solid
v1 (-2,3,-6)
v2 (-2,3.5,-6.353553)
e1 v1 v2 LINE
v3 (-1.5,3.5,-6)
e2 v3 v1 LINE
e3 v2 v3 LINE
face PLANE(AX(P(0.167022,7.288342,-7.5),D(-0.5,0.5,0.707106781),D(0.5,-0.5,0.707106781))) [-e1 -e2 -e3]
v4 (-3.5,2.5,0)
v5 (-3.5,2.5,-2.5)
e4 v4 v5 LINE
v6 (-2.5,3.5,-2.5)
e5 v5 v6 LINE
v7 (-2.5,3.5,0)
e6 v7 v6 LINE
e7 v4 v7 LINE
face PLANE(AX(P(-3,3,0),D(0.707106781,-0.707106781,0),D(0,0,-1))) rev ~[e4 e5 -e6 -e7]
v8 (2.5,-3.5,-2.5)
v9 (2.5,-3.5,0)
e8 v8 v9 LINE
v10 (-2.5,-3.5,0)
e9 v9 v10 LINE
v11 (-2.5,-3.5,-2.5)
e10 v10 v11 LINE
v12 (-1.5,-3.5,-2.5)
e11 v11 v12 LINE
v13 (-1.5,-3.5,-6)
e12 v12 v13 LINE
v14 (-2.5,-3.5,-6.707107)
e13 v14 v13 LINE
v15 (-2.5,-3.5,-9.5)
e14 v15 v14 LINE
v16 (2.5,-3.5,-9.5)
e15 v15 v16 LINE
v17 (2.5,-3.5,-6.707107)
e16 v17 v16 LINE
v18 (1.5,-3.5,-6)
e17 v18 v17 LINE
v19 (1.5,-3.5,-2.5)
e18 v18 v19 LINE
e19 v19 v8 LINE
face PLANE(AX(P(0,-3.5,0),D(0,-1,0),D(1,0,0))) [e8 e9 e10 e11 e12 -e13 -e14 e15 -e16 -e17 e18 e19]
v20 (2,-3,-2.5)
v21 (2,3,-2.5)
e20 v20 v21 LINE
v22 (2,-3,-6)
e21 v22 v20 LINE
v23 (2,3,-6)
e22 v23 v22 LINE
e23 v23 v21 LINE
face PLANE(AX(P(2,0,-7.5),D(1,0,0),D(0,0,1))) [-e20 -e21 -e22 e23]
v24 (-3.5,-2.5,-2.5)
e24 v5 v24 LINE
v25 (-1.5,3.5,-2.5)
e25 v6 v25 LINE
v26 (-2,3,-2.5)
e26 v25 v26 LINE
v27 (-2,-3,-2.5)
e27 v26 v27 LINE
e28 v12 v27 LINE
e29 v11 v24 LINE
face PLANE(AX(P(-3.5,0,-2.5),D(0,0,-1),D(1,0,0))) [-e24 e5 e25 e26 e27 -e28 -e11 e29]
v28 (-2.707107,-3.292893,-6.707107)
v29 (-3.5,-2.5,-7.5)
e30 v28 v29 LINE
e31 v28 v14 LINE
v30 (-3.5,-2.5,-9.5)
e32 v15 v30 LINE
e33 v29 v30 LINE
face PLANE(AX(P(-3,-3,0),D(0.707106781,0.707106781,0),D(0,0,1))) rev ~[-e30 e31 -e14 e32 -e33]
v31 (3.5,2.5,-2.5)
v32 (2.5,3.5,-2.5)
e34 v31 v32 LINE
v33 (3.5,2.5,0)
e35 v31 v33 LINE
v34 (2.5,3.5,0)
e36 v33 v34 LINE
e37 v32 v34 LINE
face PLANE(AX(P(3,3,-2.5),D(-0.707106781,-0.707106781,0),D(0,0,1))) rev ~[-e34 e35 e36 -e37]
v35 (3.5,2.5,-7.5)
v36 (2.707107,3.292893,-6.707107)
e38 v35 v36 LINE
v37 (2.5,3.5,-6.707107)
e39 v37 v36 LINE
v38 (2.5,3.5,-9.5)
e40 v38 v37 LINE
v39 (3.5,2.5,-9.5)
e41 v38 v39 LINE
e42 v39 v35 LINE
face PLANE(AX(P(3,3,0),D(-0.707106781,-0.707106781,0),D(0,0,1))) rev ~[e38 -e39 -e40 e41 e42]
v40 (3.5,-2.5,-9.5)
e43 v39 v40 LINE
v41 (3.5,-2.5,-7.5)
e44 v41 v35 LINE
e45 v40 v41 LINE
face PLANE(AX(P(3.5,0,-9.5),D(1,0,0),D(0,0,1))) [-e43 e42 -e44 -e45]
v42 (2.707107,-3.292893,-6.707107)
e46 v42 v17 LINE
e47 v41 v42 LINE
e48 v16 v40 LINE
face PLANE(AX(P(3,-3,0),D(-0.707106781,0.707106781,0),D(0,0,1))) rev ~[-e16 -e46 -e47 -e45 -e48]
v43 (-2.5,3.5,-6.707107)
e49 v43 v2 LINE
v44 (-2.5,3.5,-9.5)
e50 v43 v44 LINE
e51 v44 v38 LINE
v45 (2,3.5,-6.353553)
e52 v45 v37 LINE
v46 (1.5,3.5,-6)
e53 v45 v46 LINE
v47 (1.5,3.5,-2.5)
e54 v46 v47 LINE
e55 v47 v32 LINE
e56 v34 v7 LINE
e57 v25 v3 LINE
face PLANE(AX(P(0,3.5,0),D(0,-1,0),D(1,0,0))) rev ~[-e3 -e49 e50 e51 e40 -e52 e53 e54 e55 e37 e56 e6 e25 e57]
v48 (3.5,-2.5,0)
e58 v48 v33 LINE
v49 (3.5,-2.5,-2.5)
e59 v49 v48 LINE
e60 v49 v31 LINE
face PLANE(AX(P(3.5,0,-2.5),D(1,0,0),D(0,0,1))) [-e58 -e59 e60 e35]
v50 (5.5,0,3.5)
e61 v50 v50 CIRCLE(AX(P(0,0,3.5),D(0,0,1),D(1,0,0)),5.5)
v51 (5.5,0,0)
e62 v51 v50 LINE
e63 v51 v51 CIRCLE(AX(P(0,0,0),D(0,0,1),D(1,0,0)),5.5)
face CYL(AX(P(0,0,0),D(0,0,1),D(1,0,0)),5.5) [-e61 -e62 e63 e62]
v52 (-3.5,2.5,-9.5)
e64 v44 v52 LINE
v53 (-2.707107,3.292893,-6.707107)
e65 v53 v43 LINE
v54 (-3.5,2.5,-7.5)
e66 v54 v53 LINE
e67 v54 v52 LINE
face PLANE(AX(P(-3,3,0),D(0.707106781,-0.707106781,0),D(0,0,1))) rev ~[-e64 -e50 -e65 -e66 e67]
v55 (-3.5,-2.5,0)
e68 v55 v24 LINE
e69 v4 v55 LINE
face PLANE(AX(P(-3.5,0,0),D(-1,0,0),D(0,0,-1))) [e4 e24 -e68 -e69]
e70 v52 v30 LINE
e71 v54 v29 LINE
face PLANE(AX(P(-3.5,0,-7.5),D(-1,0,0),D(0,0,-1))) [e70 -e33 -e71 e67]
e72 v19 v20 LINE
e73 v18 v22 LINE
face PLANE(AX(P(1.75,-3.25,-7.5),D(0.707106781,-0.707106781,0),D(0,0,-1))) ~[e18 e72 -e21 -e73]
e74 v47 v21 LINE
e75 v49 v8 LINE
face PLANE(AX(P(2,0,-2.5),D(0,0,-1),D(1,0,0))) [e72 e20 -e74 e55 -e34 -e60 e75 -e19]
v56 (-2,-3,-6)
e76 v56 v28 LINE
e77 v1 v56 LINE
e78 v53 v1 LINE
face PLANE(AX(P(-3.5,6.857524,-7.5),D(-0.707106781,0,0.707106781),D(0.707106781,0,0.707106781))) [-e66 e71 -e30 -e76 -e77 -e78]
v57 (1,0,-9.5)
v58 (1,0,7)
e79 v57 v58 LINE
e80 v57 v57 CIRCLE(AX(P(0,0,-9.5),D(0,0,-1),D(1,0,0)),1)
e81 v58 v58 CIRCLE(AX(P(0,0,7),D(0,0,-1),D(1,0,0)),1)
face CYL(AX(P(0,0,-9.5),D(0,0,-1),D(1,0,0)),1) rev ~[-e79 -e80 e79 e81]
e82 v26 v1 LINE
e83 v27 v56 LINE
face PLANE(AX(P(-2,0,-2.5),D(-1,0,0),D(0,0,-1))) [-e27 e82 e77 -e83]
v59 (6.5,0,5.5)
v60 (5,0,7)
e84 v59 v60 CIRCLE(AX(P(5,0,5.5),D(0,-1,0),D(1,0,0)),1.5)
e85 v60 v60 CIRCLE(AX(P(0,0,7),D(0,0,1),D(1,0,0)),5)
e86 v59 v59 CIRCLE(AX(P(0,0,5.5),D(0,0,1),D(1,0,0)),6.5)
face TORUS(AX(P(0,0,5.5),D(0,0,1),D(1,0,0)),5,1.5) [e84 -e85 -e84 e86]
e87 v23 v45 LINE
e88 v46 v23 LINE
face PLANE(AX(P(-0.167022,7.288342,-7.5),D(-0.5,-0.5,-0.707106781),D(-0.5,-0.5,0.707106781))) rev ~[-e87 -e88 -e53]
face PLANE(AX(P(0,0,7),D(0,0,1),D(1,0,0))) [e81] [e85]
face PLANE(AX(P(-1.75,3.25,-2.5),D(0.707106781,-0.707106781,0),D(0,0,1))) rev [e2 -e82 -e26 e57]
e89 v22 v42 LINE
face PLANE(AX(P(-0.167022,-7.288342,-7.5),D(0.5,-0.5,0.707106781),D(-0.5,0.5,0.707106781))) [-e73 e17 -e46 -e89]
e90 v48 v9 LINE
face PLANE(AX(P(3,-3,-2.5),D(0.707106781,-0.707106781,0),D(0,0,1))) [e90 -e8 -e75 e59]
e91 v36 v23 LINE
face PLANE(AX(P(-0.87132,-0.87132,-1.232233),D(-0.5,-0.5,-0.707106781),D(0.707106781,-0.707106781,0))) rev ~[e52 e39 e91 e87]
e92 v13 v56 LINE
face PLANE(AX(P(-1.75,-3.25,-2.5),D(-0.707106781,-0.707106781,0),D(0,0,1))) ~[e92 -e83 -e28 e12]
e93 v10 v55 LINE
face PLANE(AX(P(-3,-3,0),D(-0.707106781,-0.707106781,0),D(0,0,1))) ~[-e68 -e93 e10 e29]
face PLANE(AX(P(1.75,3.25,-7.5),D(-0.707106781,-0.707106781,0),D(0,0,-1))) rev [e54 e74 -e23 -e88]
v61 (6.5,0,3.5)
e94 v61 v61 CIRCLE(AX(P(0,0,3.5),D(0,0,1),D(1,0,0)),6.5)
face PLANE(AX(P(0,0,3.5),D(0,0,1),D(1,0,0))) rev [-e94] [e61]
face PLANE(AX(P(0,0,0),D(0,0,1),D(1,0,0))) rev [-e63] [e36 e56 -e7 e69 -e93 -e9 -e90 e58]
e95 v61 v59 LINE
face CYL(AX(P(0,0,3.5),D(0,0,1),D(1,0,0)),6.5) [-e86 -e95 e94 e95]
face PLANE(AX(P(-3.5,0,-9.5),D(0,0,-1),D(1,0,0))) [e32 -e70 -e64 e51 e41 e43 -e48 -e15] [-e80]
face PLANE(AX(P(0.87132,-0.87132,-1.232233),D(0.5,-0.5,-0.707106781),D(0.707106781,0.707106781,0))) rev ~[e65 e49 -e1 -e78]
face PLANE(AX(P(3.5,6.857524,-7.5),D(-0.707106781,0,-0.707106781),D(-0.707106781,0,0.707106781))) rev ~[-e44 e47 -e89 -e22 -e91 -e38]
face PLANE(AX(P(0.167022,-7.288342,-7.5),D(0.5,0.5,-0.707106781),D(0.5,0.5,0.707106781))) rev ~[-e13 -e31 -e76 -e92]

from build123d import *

# Parameters (mm, degrees)
F3_DEPTH     = 3.5
F4_SIZE      = 1
F5_SIZE      = 0.5
F6_T4_DEPTH  = 8.4221557451
F6_T11_DEPTH = 13.7150489639
F6_T21_DEPTH = 8.4221557451
F6_T28_DEPTH = 8.4221557451
F6_T35_DEPTH = 13.7150489639
F6_T45_DEPTH = 8.4221557451
F7_R         = 1.5
F8_R         = 1
F9_DEPTH     = 25


# Not quite as in the source:
# - a fillet or chamfer that OpenCascade refuses, or shapes differently, is made with other operations: its cross-section is extruded or revolved along the edge and cut away or added


with BuildPart() as f1:
    # F0 (on Front) → F1 (revolve)
    with BuildSketch(Plane.XZ):
        Polygon((0, 7), (0, 0), (5.5, 0), (5.5, 3.5), (6.5, 3.5), (6.5, 7), align=None)
    revolve(axis=Axis((0, 0, 5.0261294236), (0, 0, 1)))

    # F2 (on Front) → F3 (join, symmetric)
    with BuildSketch(Plane.XZ):
        Polygon((3.5, 0), (-3.5, 0), (-3.5, -2.5), (-2, -2.5), (-2, -7.5), (-3.5, -7.5), (-3.5, -9.5), (3.5, -9.5), (3.5, -7.5), (2, -7.5), (2, -2.5), (3.5, -2.5), align=None)
    extrude(amount=F3_DEPTH, both=True)

    # F4
    f4_edges = [f1.edges().sort_by_distance(p)[0] for p in [
        (3.5, -3.5, -1.25),
        (3.5, 3.5, -1.25),
        (-3.5, 3.5, -1.25),
        (-3.5, -3.5, -1.25),
        (-3.5, -3.5, -8.5),
        (3.5, -3.5, -8.5),
        (-3.5, 3.5, -8.5),
        (3.5, 3.5, -8.5),
    ]]
    chamfer(f4_edges, length=F4_SIZE)

    # F5
    f5_edges = [f1.edges().sort_by_distance(p)[0] for p in [
        (2, -3.5, -5),
        (-2, -3.5, -5),
        (-2, 3.5, -5),
        (2, 3.5, -5),
    ]]
    chamfer(f5_edges, length=F5_SIZE)

    # F6: chamfer of 1.5 on 6 edges, made by hand


with BuildPart() as f6_tool2:
    # F6_s3 → F6_t4 (new body)
    with BuildSketch(Plane(origin=(3.7276817198, -3.7276817198, 0), x_dir=(0, 0, 1), z_dir=(-0.7071067812, 0.7071067812, 0))):
        Polygon((-7.5, -5.0355339059), (-6, -3.5355339059), (-7.5, -3.5355339059), align=None)
    extrude(amount=F6_T4_DEPTH)

    split(bisect_by=Plane.XZ.offset(3.5), keep=Keep.BOTTOM)

    split(bisect_by=Plane(origin=(-3, -3, 0), x_dir=(0, 0, 1), z_dir=(0.7071067812, 0.7071067812, 0)), keep=Keep.TOP)

    split(bisect_by=Plane(origin=(2, 0, -2), x_dir=(0, 1, 0), z_dir=(0.7071067812, 0, -0.7071067812)), keep=Keep.TOP)


with BuildPart() as f1_1:
    add(f1.part)

    # F6_t1: union F6_tool2
    add(f6_tool2.part)


with BuildPart() as f6_tool9:
    # F6_s10 → F6_t11 (new body)
    with BuildSketch(Plane.XZ.offset(-6.8575244819)):
        Polygon((-3.5, -7.5), (-2, -6), (-2, -7.5), align=None)
    extrude(amount=F6_T11_DEPTH)

    split(bisect_by=Plane.XZ.offset(3.5), keep=Keep.BOTTOM)

    split(bisect_by=Plane(origin=(-3, -3, 0), x_dir=(0, 0, 1), z_dir=(0.7071067812, 0.7071067812, 0)), keep=Keep.TOP)

    split(bisect_by=Plane.XZ.offset(-3.5), keep=Keep.TOP)

    split(bisect_by=Plane(origin=(-3, 3, 0), x_dir=(0, 0, 1), z_dir=(0.7071067812, -0.7071067812, 0)), keep=Keep.TOP)

    split(bisect_by=Plane(origin=(0.8713203436, -0.8713203436, -1.232233047), x_dir=(0.7071067812, 0.7071067812, 0), z_dir=(0.5, -0.5, -0.7071067812)), keep=Keep.TOP)

    split(bisect_by=Plane(origin=(0.8713203436, 0.8713203436, -1.232233047), x_dir=(-0.7071067812, 0.7071067812, 0), z_dir=(0.5, 0.5, -0.7071067812)), keep=Keep.TOP)


with BuildPart() as f1_2:
    add(f1_1.part)

    # F6_t8: union F6_tool9
    add(f6_tool9.part)


with BuildPart() as f6_tool19:
    # F6_s20 → F6_t21 (new body)
    with BuildSketch(Plane(origin=(3.7276817198, 3.7276817198, 0), x_dir=(0, 0, 1), z_dir=(-0.7071067812, -0.7071067812, 0))):
        Polygon((-7.5, 5.0355339059), (-6, 3.5355339059), (-7.5, 3.5355339059), align=None)
    extrude(amount=F6_T21_DEPTH)

    split(bisect_by=Plane.XZ.offset(-3.5), keep=Keep.TOP)

    split(bisect_by=Plane(origin=(-3, 3, 0), x_dir=(0, 0, 1), z_dir=(0.7071067812, -0.7071067812, 0)), keep=Keep.TOP)

    split(bisect_by=Plane(origin=(2, 0, -2), x_dir=(0, 1, 0), z_dir=(0.7071067812, 0, -0.7071067812)), keep=Keep.TOP)


with BuildPart() as f1_3:
    add(f1_2.part)

    # F6_t18: union F6_tool19
    add(f6_tool19.part)


with BuildPart() as f6_tool26:
    # F6_s27 → F6_t28 (new body)
    with BuildSketch(Plane(origin=(-3.7276817198, -3.7276817198, 0), x_dir=(0, 0, 1), z_dir=(0.7071067812, 0.7071067812, 0))):
        Polygon((-7.5, 5.0355339059), (-6, 3.5355339059), (-7.5, 3.5355339059), align=None)
    extrude(amount=F6_T28_DEPTH)

    split(bisect_by=Plane.XZ.offset(3.5), keep=Keep.BOTTOM)

    split(bisect_by=Plane(origin=(3, -3, 0), x_dir=(0, 0, 1), z_dir=(-0.7071067812, 0.7071067812, 0)), keep=Keep.TOP)

    split(bisect_by=Plane(origin=(-2, 0, -2), x_dir=(0, 1, 0), z_dir=(-0.7071067812, 0, -0.7071067812)), keep=Keep.TOP)


with BuildPart() as f1_4:
    add(f1_3.part)

    # F6_t25: union F6_tool26
    add(f6_tool26.part)


with BuildPart() as f6_tool33:
    # F6_s34 → F6_t35 (new body)
    with BuildSketch(Plane.XZ.offset(-6.8575244819)):
        Polygon((3.5, -7.5), (2, -6), (2, -7.5), align=None)
    extrude(amount=F6_T35_DEPTH)

    split(bisect_by=Plane.XZ.offset(3.5), keep=Keep.BOTTOM)

    split(bisect_by=Plane(origin=(3, -3, 0), x_dir=(0, 0, 1), z_dir=(-0.7071067812, 0.7071067812, 0)), keep=Keep.TOP)

    split(bisect_by=Plane.XZ.offset(-3.5), keep=Keep.TOP)

    split(bisect_by=Plane(origin=(3, 3, 0), x_dir=(0, 0, 1), z_dir=(-0.7071067812, -0.7071067812, 0)), keep=Keep.TOP)

    split(bisect_by=Plane(origin=(-0.8713203436, -0.8713203436, -1.232233047), x_dir=(0.7071067812, -0.7071067812, 0), z_dir=(-0.5, -0.5, -0.7071067812)), keep=Keep.TOP)

    split(bisect_by=Plane(origin=(-0.8713203436, 0.8713203436, -1.232233047), x_dir=(-0.7071067812, -0.7071067812, 0), z_dir=(-0.5, 0.5, -0.7071067812)), keep=Keep.TOP)


with BuildPart() as f1_5:
    add(f1_4.part)

    # F6_t32: union F6_tool33
    add(f6_tool33.part)


with BuildPart() as f6_tool43:
    # F6_s44 → F6_t45 (new body)
    with BuildSketch(Plane(origin=(-3.7276817198, 3.7276817198, 0), x_dir=(0, 0, 1), z_dir=(0.7071067812, -0.7071067812, 0))):
        Polygon((-7.5, -5.0355339059), (-6, -3.5355339059), (-7.5, -3.5355339059), align=None)
    extrude(amount=F6_T45_DEPTH)

    split(bisect_by=Plane.XZ.offset(-3.5), keep=Keep.TOP)

    split(bisect_by=Plane(origin=(3, 3, 0), x_dir=(0, 0, 1), z_dir=(-0.7071067812, -0.7071067812, 0)), keep=Keep.TOP)

    split(bisect_by=Plane(origin=(-2, 0, -2), x_dir=(0, 1, 0), z_dir=(-0.7071067812, 0, -0.7071067812)), keep=Keep.TOP)


with BuildPart() as f1_6:
    add(f1_5.part)

    # F6_t42: union F6_tool43
    add(f6_tool43.part)

    # F7
    f7_edges = [f1_6.edges().sort_by_distance(p)[0] for p in [
        (-6.5, 0, 7),
    ]]
    fillet(f7_edges, radius=F7_R)

    # F8 (on face) → F9 (cut)
    with BuildSketch(Plane(origin=(0, 0, -9.5), x_dir=(1, 0, 0), z_dir=(0, 0, -1))):
        Circle(F8_R)
    extrude(amount=-F9_DEPTH, mode=Mode.SUBTRACT)


solid = f1_6.part
